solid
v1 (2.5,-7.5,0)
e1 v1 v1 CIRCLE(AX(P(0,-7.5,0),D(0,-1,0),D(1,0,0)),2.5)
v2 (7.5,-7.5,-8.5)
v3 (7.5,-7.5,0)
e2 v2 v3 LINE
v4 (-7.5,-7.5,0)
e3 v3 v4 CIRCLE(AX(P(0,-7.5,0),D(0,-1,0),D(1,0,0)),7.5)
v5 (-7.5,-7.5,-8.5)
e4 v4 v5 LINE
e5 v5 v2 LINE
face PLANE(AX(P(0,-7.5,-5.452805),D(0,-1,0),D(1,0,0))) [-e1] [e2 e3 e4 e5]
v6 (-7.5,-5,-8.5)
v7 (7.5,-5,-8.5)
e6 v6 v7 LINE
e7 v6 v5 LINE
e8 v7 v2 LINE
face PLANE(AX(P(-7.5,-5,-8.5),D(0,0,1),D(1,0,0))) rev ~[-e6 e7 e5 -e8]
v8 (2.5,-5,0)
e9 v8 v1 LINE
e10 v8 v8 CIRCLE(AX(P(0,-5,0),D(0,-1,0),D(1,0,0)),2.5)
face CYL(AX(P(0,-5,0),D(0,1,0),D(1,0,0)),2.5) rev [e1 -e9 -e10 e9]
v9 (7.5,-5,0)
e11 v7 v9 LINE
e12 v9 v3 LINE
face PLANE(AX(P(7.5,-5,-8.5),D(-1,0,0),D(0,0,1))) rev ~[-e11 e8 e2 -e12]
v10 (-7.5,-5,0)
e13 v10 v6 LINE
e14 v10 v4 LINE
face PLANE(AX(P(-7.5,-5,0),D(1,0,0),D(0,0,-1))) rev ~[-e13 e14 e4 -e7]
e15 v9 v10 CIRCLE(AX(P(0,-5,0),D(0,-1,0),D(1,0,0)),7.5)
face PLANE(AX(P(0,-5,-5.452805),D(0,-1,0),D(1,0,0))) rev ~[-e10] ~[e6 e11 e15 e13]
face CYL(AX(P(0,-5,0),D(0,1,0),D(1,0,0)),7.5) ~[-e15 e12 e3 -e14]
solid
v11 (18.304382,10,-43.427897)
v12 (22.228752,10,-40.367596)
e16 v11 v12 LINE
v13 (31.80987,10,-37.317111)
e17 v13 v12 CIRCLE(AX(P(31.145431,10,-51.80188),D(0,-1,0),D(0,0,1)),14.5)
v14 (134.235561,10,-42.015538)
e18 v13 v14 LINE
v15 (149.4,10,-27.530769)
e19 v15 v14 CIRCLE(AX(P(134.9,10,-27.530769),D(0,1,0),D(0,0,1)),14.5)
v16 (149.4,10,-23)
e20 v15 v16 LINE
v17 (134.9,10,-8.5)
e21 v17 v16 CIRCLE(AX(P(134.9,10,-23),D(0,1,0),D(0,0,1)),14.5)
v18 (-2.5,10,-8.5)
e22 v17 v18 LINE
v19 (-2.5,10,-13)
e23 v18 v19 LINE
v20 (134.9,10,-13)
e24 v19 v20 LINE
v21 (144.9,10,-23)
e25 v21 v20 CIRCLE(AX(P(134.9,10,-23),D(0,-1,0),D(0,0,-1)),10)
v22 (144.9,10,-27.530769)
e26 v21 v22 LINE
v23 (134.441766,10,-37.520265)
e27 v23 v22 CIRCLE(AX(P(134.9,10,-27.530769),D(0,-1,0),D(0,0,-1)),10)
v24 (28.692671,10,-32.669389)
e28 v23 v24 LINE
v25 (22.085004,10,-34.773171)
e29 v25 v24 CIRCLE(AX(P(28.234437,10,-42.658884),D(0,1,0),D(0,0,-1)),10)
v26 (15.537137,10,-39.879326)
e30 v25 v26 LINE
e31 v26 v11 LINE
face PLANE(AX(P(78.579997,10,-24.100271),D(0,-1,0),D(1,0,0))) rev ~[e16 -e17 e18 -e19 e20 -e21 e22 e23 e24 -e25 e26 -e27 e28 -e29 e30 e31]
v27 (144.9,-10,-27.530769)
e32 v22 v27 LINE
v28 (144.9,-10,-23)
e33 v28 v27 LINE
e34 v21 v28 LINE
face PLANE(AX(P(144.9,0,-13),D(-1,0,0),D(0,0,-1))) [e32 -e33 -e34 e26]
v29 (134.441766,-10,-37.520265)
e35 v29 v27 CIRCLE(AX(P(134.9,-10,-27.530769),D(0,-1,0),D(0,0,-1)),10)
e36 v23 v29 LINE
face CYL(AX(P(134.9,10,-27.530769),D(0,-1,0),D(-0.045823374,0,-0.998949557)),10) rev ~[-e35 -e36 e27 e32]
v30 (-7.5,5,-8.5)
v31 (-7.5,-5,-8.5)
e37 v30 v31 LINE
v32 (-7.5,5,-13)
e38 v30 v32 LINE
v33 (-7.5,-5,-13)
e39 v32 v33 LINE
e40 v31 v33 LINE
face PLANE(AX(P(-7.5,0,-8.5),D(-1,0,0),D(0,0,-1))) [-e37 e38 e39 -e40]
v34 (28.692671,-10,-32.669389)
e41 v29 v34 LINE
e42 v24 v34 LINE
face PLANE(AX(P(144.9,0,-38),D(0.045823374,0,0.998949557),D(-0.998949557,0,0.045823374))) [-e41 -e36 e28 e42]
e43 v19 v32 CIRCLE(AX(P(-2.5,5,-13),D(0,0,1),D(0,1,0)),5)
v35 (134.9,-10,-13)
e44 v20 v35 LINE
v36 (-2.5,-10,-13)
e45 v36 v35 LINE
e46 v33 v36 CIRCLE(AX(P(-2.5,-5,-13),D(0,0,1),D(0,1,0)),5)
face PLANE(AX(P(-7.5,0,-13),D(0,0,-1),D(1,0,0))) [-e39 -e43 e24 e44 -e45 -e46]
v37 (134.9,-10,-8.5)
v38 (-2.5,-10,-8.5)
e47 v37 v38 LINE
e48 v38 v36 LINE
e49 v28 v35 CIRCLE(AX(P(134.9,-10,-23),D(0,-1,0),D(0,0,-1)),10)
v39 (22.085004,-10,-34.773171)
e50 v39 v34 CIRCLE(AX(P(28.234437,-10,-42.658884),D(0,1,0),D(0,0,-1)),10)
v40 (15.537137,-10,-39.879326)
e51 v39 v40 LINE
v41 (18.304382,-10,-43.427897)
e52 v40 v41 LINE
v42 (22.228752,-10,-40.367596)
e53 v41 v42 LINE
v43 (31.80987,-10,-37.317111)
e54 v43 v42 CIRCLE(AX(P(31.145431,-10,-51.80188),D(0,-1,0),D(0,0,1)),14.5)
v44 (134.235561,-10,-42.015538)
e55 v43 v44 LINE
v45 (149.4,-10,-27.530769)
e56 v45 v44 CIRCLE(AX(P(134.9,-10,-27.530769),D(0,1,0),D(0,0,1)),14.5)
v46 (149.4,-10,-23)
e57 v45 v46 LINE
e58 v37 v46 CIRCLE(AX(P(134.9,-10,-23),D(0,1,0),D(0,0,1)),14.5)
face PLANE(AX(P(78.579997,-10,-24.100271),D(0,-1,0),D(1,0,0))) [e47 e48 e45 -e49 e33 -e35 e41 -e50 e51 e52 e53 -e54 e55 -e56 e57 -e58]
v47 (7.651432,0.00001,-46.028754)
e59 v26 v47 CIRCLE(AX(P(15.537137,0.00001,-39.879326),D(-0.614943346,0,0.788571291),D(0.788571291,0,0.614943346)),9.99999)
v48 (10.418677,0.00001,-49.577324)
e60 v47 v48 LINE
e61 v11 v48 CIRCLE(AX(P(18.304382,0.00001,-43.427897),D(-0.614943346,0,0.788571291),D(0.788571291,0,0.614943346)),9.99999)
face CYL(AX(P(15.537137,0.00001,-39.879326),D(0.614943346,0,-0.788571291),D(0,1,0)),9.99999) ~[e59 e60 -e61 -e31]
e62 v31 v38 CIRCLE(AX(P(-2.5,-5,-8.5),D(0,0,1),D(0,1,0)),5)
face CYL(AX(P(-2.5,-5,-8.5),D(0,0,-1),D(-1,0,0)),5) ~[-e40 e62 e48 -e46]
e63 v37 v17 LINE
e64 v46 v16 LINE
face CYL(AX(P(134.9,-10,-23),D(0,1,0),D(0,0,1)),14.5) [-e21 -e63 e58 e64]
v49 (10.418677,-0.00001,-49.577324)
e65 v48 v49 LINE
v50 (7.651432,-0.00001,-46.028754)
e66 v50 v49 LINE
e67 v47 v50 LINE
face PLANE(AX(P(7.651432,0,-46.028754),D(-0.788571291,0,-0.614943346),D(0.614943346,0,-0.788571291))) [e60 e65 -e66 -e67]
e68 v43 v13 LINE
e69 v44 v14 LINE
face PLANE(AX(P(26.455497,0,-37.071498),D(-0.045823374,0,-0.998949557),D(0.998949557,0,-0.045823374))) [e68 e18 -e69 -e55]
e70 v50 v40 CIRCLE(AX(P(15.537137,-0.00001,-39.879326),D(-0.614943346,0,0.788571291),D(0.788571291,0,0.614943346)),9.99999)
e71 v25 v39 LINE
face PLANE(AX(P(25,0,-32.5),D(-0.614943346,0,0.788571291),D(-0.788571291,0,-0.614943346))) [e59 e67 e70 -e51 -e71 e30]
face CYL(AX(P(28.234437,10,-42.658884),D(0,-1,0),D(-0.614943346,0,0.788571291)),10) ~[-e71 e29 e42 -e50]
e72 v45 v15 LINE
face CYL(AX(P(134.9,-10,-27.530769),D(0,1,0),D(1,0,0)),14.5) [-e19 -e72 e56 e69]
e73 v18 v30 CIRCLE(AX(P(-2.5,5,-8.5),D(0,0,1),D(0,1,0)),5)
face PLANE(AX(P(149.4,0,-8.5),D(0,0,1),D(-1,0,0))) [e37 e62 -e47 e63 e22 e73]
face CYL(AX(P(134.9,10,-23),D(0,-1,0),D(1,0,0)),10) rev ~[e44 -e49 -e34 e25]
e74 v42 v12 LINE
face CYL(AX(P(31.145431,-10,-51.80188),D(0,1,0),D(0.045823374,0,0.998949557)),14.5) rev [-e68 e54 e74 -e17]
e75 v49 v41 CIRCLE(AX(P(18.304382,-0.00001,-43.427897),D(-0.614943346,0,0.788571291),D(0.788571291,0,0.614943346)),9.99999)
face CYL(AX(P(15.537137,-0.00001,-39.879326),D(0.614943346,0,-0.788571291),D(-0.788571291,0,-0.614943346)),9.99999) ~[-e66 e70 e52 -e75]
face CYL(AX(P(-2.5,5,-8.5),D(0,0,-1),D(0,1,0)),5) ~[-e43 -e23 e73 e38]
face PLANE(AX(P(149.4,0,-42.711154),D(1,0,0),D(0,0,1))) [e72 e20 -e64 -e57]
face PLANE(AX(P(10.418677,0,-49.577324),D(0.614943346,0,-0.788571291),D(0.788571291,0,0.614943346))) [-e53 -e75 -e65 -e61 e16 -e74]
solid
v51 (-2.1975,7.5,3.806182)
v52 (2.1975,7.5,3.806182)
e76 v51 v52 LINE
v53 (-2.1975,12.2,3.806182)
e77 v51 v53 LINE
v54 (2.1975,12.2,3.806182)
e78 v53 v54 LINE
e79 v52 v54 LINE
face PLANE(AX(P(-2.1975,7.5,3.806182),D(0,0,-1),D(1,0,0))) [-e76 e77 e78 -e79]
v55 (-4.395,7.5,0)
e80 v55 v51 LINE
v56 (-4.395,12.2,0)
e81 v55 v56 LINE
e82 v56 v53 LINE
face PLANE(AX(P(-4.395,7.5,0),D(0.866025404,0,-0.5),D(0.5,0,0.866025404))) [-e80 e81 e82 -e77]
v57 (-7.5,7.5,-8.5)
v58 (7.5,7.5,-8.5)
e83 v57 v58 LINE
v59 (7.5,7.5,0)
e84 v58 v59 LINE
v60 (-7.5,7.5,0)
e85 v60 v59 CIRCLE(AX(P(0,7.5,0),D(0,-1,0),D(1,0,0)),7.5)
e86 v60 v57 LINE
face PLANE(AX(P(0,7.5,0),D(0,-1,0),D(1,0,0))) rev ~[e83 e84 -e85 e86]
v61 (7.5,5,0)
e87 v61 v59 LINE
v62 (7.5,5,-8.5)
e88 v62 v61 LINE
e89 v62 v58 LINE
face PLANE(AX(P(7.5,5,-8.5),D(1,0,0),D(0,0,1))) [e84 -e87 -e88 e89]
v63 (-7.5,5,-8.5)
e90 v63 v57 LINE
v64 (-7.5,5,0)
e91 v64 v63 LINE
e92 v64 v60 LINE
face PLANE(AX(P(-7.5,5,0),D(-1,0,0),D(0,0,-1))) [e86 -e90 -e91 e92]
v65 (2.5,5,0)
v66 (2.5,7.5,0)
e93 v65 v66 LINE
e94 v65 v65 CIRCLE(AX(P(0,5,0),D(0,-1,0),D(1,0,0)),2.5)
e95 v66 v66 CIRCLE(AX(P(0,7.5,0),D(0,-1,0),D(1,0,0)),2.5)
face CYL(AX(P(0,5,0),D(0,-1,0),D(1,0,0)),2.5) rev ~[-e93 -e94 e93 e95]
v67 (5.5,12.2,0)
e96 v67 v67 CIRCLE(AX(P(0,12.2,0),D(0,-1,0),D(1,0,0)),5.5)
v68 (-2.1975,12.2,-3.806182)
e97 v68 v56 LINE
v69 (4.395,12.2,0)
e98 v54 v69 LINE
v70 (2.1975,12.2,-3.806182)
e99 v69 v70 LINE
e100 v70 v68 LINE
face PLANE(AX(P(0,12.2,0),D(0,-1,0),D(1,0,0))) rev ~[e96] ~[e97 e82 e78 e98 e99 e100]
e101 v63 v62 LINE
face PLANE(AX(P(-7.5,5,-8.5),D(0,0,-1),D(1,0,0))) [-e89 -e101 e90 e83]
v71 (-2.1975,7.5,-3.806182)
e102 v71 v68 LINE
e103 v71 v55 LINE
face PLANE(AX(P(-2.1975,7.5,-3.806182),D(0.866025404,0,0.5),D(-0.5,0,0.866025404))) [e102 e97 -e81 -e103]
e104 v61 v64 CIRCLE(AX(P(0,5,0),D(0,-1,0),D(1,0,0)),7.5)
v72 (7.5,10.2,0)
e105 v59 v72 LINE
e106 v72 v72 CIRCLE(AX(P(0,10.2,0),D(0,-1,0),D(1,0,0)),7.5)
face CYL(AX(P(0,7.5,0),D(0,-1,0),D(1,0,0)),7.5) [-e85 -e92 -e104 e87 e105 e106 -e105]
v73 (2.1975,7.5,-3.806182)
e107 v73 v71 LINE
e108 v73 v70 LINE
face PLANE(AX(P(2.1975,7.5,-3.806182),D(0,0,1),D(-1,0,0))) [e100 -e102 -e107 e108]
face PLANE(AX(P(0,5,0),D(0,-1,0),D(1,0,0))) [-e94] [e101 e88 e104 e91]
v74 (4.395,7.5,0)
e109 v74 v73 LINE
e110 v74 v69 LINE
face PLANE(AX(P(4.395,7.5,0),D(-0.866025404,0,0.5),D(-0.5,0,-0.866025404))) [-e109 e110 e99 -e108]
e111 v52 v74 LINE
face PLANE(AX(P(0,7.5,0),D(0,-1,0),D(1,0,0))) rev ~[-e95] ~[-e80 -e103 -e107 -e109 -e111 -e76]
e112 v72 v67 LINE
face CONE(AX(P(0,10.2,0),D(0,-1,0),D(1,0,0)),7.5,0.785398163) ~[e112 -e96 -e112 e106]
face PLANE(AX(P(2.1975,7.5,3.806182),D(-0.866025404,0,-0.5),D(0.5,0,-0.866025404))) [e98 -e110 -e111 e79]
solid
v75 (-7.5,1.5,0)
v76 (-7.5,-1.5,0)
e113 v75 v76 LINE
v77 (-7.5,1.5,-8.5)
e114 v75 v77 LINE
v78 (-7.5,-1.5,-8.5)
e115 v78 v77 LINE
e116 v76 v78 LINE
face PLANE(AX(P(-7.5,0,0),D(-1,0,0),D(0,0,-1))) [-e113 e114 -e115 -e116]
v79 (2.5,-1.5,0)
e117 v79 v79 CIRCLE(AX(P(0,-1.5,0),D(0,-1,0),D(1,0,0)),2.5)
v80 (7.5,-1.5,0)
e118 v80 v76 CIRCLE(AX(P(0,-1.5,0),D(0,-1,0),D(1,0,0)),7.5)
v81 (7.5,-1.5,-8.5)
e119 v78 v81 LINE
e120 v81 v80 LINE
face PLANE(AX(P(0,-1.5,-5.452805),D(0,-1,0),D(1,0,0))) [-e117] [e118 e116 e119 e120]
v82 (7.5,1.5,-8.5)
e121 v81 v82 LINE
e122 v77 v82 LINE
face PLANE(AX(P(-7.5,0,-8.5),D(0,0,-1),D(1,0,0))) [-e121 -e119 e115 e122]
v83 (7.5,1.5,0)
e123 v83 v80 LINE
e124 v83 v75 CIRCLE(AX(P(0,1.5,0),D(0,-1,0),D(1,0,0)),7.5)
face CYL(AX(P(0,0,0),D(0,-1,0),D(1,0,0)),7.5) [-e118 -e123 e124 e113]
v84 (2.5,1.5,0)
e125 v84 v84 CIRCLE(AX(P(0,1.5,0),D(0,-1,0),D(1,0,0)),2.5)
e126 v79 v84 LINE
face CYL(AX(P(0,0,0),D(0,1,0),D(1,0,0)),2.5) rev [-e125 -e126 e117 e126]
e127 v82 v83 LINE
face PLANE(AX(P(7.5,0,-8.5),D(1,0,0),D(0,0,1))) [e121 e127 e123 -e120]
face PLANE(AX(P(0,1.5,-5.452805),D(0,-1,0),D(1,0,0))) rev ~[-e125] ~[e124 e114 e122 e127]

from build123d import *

# Parameters (mm, degrees)
F0_R     = 2.5
F1_DEPTH = 1.5
F2_START = 5
F2_DEPTH = 2.5
F3_START = -5
F3_DEPTH = 2.5
F4_START = -7.5
F4_DEPTH = 4.7
F5_SIZE  = 2
F7_DEPTH = 10
F8_R     = 10
F9_R     = 14.5
F10_R    = 9.99999
F11_R    = 5


# Not quite as in the source:
# - a fillet or chamfer is up to 0.001 mm smaller than in the source, because OpenCascade refuses the exact size


with BuildPart() as f1:
    # F0 (on Front) → F1 (new body, symmetric)
    with BuildSketch(Plane.XZ):
        with BuildLine():
            Line((7.5, -8.5), (7.5, 0))
            ThreePointArc((7.5, 0), (0, -7.5), (-7.5, 0))
            Line((-7.5, 0), (-7.5, -8.5))
            Line((-7.5, -8.5), (7.5, -8.5))
        make_face()
        with BuildLine():
            ThreePointArc((-7.5, 0), (0, -7.5), (7.5, 0))
            ThreePointArc((7.5, 0), (0, 7.5), (-7.5, 0))
        make_face()
        Polygon((2.1975, 3.8061816496), (4.395, 0), (2.1975, -3.8061816496), (-2.1975, -3.8061816496), (-4.395, 0), (-2.1975, 3.8061816496), align=None, mode=Mode.SUBTRACT)
        Polygon((2.1975, -3.8061816496), (4.395, 0), (2.1975, 3.8061816496), (-2.1975, 3.8061816496), (-4.395, 0), (-2.1975, -3.8061816496), align=None)
        Circle(F0_R, mode=Mode.SUBTRACT)
    extrude(amount=F1_DEPTH, both=True)


with BuildPart() as f2:
    # F0 (on Front) → F2 (new body)
    with BuildSketch(Plane.XZ.offset(F2_START)):
        with BuildLine():
            Line((7.5, -8.5), (7.5, 0))
            ThreePointArc((7.5, 0), (0, -7.5), (-7.5, 0))
            Line((-7.5, 0), (-7.5, -8.5))
            Line((-7.5, -8.5), (7.5, -8.5))
        make_face()
        with BuildLine():
            ThreePointArc((-7.5, 0), (0, -7.5), (7.5, 0))
            ThreePointArc((7.5, 0), (0, 7.5), (-7.5, 0))
        make_face()
        Polygon((2.1975, 3.8061816496), (4.395, 0), (2.1975, -3.8061816496), (-2.1975, -3.8061816496), (-4.395, 0), (-2.1975, 3.8061816496), align=None, mode=Mode.SUBTRACT)
        Polygon((2.1975, -3.8061816496), (4.395, 0), (2.1975, 3.8061816496), (-2.1975, 3.8061816496), (-4.395, 0), (-2.1975, -3.8061816496), align=None)
        Circle(F0_R, mode=Mode.SUBTRACT)
    extrude(amount=F2_DEPTH)


with BuildPart() as f3:
    # F0 (on Front) → F3 (new body)
    with BuildSketch(Plane.XZ.offset(F3_START)):
        with BuildLine():
            ThreePointArc((-7.5, 0), (0, -7.5), (7.5, 0))
            ThreePointArc((7.5, 0), (0, 7.5), (-7.5, 0))
        make_face()
        Polygon((2.1975, 3.8061816496), (4.395, 0), (2.1975, -3.8061816496), (-2.1975, -3.8061816496), (-4.395, 0), (-2.1975, 3.8061816496), align=None, mode=Mode.SUBTRACT)
        with BuildLine():
            Line((7.5, -8.5), (7.5, 0))
            ThreePointArc((7.5, 0), (0, -7.5), (-7.5, 0))
            Line((-7.5, 0), (-7.5, -8.5))
            Line((-7.5, -8.5), (7.5, -8.5))
        make_face()
        Polygon((2.1975, -3.8061816496), (4.395, 0), (2.1975, 3.8061816496), (-2.1975, 3.8061816496), (-4.395, 0), (-2.1975, -3.8061816496), align=None)
        Circle(F0_R, mode=Mode.SUBTRACT)
    extrude(amount=-F3_DEPTH)

    # F0 (on Front) → F4 (join)
    with BuildSketch(Plane.XZ.offset(F4_START)):
        with BuildLine():
            ThreePointArc((-7.5, 0), (0, -7.5), (7.5, 0))
            ThreePointArc((7.5, 0), (0, 7.5), (-7.5, 0))
        make_face()
        Polygon((2.1975, 3.8061816496), (4.395, 0), (2.1975, -3.8061816496), (-2.1975, -3.8061816496), (-4.395, 0), (-2.1975, 3.8061816496), align=None, mode=Mode.SUBTRACT)
    extrude(amount=-F4_DEPTH)

    # F5
    f5_edges = [f3.edges().sort_by_distance(p)[0] for p in [
        (-7.5, 12.2, 0),
    ]]
    chamfer(f5_edges, length=F5_SIZE)


with BuildPart() as f7:
    # F6 (on Front) → F7 (new body, symmetric)
    with BuildSketch(Plane.XZ):
        Polygon((149.4, -8.5), (-7.5, -8.5), (-7.5, -13), (144.9, -13), (144.9, -38), (25, -32.5), (7.6514315894, -46.028753605), (10.418676645, -49.5773244162), (26.4554967217, -37.0714978667), (149.4, -42.7111539804), align=None)
    extrude(amount=F7_DEPTH, both=True)

    # F8
    f8_edges = [f7.edges().sort_by_distance(p)[0] for p in [
        (25, 0, -32.5),
        (144.9, 0, -38),
        (144.9, 0, -13),
    ]]
    fillet(f8_edges, radius=F8_R)

    # F9
    f9_edges = [f7.edges().sort_by_distance(p)[0] for p in [
        (149.4, 0, -42.711154),
        (149.4, 0, -8.5),
        (26.455497, 0, -37.071498),
    ]]
    fillet(f9_edges, radius=F9_R)

    # F10 (radius 10 in the source; OpenCascade refuses exactly that, so slightly less here)
    f10_edges = [f7.edges().sort_by_distance(p)[0] for p in [
        (9.035054, 10, -47.803039),
        (9.035054, -10, -47.803039),
    ]]
    fillet(f10_edges, radius=F10_R)

    # F11
    f11_edges = [f7.edges().sort_by_distance(p)[0] for p in [
        (-7.5, -10, -10.75),
        (-7.5, 10, -10.75),
    ]]
    fillet(f11_edges, radius=F11_R)


solid = Compound([f1.part, f2.part, f3.part, f7.part])
